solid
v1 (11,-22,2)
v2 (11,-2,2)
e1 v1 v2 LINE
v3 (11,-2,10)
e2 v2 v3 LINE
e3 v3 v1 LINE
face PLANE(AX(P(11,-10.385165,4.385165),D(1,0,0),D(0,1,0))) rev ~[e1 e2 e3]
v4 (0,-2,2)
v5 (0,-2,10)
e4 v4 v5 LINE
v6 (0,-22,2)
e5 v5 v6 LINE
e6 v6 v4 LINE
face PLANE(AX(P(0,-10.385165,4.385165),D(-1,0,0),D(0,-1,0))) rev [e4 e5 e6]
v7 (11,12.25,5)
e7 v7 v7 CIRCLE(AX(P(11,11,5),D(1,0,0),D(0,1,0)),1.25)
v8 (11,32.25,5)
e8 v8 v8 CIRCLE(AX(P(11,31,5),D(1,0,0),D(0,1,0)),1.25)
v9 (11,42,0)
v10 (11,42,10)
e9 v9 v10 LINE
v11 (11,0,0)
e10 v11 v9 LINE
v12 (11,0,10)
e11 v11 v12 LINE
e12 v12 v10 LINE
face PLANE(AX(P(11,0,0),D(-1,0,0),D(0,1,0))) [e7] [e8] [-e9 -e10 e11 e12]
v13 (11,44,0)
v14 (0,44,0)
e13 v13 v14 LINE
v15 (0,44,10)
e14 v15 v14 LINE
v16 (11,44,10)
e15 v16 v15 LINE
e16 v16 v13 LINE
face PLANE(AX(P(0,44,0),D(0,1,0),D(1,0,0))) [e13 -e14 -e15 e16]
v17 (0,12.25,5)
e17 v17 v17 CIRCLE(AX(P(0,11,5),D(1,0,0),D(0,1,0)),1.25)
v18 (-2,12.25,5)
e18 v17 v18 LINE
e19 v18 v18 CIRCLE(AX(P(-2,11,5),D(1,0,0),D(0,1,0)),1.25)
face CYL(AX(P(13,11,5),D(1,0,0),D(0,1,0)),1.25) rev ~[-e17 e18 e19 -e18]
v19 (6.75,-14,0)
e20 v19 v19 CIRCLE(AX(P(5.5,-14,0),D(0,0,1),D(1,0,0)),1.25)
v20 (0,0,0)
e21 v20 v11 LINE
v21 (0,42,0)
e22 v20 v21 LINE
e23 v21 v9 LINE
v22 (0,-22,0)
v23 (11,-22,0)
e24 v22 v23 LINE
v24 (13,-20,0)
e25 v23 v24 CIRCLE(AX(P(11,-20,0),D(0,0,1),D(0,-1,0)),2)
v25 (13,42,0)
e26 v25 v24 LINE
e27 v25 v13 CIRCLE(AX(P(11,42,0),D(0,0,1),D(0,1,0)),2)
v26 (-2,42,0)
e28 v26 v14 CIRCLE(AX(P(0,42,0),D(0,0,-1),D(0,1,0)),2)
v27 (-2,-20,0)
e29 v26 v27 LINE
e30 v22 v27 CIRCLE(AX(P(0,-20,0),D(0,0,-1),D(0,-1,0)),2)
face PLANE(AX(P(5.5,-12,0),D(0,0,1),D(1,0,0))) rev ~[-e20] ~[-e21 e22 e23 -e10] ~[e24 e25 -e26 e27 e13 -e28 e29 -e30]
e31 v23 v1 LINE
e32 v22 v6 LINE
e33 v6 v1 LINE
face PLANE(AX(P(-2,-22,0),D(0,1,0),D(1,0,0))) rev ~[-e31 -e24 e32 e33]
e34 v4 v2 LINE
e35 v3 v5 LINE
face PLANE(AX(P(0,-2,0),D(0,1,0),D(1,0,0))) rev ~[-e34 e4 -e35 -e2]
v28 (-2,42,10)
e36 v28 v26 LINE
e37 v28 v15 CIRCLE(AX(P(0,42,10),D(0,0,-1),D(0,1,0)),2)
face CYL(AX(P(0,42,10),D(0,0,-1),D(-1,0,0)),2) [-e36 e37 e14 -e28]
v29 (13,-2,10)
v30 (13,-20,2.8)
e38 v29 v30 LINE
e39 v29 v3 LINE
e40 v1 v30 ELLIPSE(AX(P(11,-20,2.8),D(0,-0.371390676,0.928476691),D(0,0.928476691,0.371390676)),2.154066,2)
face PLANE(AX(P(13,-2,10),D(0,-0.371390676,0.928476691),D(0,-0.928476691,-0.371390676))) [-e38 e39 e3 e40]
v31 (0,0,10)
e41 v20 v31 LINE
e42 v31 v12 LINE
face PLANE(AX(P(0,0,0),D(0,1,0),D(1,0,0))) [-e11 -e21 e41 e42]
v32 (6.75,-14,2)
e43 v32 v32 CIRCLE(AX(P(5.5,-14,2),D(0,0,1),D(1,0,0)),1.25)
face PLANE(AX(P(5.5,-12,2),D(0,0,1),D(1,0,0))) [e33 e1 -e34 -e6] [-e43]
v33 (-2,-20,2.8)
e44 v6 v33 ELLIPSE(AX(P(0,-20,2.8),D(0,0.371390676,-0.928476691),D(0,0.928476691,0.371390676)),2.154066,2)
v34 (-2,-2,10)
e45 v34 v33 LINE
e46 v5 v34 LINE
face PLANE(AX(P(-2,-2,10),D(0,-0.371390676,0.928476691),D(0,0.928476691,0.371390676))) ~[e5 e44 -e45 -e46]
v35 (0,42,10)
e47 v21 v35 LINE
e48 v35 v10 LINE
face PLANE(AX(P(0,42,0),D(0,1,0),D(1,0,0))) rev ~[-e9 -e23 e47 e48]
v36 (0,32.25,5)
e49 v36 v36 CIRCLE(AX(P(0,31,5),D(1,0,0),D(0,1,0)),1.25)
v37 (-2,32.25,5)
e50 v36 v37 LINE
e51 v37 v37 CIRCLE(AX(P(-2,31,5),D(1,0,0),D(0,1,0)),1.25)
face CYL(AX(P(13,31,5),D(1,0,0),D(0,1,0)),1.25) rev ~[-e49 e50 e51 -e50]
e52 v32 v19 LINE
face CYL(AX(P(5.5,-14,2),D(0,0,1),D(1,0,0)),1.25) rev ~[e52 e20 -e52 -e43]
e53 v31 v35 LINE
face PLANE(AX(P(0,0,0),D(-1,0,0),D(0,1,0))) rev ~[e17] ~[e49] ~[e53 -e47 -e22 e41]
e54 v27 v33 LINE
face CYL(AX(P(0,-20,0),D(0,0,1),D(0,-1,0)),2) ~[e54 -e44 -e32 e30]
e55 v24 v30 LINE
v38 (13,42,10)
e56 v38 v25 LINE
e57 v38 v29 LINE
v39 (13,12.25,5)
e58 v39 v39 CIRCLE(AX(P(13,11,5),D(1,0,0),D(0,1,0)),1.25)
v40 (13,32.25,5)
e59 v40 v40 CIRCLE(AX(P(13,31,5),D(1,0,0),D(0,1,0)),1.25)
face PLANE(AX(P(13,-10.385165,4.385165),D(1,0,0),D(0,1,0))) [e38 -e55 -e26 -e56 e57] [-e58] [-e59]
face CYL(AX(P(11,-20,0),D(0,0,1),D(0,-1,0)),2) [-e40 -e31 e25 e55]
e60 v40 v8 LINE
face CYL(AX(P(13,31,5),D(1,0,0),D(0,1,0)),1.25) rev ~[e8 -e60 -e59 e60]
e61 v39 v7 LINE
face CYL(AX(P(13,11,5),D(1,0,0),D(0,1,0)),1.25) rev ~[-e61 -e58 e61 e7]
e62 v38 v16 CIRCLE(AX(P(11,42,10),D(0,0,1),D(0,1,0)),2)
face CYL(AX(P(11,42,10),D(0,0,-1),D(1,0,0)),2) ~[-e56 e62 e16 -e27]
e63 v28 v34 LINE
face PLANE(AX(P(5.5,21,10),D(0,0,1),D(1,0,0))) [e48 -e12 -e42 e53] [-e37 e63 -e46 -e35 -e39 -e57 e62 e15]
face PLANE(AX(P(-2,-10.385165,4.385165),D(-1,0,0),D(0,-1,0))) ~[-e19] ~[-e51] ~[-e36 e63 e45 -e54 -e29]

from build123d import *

# Parameters (mm, degrees)
F0_W      = 11
F0_H      = 42
F1_DEPTH  = 10
F2_T      = 2
F3_W      = 15
F3_H      = 20
F4_DEPTH  = 2
F6_DEPTH  = 2
F8_R      = 1.25
F9_DEPTH  = 2.001
F10_R     = 1.25
F11_DEPTH = 15.001
F12_R     = 2


# Not quite as in the source:
# - a pattern or mirror of a feature is missing from the dataset's text; its kind, count and spacing are read off the source's solid


with BuildPart() as f1:
    # F0 (on Top) → F1 (new body)
    with BuildSketch(Plane.XY):
        with Locations((5.5, 21)):
            Rectangle(F0_W, F0_H)
    extrude(amount=F1_DEPTH)

    # F2
    f2_openings = [f1.faces().sort_by_distance(p)[0] for p in [
        (5.5, 21, 10),
        (5.5, 21, 0),
    ]]
    offset(amount=F2_T, openings=f2_openings, kind=Kind.INTERSECTION)

    # F3 (on Top) → F4 (join)
    with BuildSketch(Plane.XY):
        with Locations((5.5, -12)):
            Rectangle(F3_W, F3_H)
    extrude(amount=F4_DEPTH)

    # F5 (on face) → F6 (join)
    with BuildSketch(Plane.YZ.offset(13)):
        Polygon((-2, 10), (-22, 2), (-2, 2), align=None)
    f6 = extrude(amount=-F6_DEPTH)

    # F6_copies: F6 across plane
    add(f6.mirror(Plane(origin=(5.5, 0, 0), x_dir=(0, 0, -1), z_dir=(-1, 0, 0))))

    # F8 (on face) → F9 (cut, through all)
    with BuildSketch(Plane.XY.offset(2)):
        with Locations((5.5, -14)):
            Circle(F8_R)
    extrude(amount=-F9_DEPTH, mode=Mode.SUBTRACT)

    # F10 (on face) → F11 (cut, through all)
    with BuildSketch(Plane.YZ.offset(13)):
        with Locations((11, 5)):
            Circle(F10_R)
        with Locations((31, 5)):
            Circle(F10_R)
    extrude(amount=-F11_DEPTH, mode=Mode.SUBTRACT)

    # F12
    f12_edges = [f1.edges().sort_by_distance(p)[0] for p in [
        (-2, -22, 1),
        (13, -22, 1),
        (13, 44, 5),
        (-2, 44, 5),
    ]]
    fillet(f12_edges, radius=F12_R)


solid = f1.part
